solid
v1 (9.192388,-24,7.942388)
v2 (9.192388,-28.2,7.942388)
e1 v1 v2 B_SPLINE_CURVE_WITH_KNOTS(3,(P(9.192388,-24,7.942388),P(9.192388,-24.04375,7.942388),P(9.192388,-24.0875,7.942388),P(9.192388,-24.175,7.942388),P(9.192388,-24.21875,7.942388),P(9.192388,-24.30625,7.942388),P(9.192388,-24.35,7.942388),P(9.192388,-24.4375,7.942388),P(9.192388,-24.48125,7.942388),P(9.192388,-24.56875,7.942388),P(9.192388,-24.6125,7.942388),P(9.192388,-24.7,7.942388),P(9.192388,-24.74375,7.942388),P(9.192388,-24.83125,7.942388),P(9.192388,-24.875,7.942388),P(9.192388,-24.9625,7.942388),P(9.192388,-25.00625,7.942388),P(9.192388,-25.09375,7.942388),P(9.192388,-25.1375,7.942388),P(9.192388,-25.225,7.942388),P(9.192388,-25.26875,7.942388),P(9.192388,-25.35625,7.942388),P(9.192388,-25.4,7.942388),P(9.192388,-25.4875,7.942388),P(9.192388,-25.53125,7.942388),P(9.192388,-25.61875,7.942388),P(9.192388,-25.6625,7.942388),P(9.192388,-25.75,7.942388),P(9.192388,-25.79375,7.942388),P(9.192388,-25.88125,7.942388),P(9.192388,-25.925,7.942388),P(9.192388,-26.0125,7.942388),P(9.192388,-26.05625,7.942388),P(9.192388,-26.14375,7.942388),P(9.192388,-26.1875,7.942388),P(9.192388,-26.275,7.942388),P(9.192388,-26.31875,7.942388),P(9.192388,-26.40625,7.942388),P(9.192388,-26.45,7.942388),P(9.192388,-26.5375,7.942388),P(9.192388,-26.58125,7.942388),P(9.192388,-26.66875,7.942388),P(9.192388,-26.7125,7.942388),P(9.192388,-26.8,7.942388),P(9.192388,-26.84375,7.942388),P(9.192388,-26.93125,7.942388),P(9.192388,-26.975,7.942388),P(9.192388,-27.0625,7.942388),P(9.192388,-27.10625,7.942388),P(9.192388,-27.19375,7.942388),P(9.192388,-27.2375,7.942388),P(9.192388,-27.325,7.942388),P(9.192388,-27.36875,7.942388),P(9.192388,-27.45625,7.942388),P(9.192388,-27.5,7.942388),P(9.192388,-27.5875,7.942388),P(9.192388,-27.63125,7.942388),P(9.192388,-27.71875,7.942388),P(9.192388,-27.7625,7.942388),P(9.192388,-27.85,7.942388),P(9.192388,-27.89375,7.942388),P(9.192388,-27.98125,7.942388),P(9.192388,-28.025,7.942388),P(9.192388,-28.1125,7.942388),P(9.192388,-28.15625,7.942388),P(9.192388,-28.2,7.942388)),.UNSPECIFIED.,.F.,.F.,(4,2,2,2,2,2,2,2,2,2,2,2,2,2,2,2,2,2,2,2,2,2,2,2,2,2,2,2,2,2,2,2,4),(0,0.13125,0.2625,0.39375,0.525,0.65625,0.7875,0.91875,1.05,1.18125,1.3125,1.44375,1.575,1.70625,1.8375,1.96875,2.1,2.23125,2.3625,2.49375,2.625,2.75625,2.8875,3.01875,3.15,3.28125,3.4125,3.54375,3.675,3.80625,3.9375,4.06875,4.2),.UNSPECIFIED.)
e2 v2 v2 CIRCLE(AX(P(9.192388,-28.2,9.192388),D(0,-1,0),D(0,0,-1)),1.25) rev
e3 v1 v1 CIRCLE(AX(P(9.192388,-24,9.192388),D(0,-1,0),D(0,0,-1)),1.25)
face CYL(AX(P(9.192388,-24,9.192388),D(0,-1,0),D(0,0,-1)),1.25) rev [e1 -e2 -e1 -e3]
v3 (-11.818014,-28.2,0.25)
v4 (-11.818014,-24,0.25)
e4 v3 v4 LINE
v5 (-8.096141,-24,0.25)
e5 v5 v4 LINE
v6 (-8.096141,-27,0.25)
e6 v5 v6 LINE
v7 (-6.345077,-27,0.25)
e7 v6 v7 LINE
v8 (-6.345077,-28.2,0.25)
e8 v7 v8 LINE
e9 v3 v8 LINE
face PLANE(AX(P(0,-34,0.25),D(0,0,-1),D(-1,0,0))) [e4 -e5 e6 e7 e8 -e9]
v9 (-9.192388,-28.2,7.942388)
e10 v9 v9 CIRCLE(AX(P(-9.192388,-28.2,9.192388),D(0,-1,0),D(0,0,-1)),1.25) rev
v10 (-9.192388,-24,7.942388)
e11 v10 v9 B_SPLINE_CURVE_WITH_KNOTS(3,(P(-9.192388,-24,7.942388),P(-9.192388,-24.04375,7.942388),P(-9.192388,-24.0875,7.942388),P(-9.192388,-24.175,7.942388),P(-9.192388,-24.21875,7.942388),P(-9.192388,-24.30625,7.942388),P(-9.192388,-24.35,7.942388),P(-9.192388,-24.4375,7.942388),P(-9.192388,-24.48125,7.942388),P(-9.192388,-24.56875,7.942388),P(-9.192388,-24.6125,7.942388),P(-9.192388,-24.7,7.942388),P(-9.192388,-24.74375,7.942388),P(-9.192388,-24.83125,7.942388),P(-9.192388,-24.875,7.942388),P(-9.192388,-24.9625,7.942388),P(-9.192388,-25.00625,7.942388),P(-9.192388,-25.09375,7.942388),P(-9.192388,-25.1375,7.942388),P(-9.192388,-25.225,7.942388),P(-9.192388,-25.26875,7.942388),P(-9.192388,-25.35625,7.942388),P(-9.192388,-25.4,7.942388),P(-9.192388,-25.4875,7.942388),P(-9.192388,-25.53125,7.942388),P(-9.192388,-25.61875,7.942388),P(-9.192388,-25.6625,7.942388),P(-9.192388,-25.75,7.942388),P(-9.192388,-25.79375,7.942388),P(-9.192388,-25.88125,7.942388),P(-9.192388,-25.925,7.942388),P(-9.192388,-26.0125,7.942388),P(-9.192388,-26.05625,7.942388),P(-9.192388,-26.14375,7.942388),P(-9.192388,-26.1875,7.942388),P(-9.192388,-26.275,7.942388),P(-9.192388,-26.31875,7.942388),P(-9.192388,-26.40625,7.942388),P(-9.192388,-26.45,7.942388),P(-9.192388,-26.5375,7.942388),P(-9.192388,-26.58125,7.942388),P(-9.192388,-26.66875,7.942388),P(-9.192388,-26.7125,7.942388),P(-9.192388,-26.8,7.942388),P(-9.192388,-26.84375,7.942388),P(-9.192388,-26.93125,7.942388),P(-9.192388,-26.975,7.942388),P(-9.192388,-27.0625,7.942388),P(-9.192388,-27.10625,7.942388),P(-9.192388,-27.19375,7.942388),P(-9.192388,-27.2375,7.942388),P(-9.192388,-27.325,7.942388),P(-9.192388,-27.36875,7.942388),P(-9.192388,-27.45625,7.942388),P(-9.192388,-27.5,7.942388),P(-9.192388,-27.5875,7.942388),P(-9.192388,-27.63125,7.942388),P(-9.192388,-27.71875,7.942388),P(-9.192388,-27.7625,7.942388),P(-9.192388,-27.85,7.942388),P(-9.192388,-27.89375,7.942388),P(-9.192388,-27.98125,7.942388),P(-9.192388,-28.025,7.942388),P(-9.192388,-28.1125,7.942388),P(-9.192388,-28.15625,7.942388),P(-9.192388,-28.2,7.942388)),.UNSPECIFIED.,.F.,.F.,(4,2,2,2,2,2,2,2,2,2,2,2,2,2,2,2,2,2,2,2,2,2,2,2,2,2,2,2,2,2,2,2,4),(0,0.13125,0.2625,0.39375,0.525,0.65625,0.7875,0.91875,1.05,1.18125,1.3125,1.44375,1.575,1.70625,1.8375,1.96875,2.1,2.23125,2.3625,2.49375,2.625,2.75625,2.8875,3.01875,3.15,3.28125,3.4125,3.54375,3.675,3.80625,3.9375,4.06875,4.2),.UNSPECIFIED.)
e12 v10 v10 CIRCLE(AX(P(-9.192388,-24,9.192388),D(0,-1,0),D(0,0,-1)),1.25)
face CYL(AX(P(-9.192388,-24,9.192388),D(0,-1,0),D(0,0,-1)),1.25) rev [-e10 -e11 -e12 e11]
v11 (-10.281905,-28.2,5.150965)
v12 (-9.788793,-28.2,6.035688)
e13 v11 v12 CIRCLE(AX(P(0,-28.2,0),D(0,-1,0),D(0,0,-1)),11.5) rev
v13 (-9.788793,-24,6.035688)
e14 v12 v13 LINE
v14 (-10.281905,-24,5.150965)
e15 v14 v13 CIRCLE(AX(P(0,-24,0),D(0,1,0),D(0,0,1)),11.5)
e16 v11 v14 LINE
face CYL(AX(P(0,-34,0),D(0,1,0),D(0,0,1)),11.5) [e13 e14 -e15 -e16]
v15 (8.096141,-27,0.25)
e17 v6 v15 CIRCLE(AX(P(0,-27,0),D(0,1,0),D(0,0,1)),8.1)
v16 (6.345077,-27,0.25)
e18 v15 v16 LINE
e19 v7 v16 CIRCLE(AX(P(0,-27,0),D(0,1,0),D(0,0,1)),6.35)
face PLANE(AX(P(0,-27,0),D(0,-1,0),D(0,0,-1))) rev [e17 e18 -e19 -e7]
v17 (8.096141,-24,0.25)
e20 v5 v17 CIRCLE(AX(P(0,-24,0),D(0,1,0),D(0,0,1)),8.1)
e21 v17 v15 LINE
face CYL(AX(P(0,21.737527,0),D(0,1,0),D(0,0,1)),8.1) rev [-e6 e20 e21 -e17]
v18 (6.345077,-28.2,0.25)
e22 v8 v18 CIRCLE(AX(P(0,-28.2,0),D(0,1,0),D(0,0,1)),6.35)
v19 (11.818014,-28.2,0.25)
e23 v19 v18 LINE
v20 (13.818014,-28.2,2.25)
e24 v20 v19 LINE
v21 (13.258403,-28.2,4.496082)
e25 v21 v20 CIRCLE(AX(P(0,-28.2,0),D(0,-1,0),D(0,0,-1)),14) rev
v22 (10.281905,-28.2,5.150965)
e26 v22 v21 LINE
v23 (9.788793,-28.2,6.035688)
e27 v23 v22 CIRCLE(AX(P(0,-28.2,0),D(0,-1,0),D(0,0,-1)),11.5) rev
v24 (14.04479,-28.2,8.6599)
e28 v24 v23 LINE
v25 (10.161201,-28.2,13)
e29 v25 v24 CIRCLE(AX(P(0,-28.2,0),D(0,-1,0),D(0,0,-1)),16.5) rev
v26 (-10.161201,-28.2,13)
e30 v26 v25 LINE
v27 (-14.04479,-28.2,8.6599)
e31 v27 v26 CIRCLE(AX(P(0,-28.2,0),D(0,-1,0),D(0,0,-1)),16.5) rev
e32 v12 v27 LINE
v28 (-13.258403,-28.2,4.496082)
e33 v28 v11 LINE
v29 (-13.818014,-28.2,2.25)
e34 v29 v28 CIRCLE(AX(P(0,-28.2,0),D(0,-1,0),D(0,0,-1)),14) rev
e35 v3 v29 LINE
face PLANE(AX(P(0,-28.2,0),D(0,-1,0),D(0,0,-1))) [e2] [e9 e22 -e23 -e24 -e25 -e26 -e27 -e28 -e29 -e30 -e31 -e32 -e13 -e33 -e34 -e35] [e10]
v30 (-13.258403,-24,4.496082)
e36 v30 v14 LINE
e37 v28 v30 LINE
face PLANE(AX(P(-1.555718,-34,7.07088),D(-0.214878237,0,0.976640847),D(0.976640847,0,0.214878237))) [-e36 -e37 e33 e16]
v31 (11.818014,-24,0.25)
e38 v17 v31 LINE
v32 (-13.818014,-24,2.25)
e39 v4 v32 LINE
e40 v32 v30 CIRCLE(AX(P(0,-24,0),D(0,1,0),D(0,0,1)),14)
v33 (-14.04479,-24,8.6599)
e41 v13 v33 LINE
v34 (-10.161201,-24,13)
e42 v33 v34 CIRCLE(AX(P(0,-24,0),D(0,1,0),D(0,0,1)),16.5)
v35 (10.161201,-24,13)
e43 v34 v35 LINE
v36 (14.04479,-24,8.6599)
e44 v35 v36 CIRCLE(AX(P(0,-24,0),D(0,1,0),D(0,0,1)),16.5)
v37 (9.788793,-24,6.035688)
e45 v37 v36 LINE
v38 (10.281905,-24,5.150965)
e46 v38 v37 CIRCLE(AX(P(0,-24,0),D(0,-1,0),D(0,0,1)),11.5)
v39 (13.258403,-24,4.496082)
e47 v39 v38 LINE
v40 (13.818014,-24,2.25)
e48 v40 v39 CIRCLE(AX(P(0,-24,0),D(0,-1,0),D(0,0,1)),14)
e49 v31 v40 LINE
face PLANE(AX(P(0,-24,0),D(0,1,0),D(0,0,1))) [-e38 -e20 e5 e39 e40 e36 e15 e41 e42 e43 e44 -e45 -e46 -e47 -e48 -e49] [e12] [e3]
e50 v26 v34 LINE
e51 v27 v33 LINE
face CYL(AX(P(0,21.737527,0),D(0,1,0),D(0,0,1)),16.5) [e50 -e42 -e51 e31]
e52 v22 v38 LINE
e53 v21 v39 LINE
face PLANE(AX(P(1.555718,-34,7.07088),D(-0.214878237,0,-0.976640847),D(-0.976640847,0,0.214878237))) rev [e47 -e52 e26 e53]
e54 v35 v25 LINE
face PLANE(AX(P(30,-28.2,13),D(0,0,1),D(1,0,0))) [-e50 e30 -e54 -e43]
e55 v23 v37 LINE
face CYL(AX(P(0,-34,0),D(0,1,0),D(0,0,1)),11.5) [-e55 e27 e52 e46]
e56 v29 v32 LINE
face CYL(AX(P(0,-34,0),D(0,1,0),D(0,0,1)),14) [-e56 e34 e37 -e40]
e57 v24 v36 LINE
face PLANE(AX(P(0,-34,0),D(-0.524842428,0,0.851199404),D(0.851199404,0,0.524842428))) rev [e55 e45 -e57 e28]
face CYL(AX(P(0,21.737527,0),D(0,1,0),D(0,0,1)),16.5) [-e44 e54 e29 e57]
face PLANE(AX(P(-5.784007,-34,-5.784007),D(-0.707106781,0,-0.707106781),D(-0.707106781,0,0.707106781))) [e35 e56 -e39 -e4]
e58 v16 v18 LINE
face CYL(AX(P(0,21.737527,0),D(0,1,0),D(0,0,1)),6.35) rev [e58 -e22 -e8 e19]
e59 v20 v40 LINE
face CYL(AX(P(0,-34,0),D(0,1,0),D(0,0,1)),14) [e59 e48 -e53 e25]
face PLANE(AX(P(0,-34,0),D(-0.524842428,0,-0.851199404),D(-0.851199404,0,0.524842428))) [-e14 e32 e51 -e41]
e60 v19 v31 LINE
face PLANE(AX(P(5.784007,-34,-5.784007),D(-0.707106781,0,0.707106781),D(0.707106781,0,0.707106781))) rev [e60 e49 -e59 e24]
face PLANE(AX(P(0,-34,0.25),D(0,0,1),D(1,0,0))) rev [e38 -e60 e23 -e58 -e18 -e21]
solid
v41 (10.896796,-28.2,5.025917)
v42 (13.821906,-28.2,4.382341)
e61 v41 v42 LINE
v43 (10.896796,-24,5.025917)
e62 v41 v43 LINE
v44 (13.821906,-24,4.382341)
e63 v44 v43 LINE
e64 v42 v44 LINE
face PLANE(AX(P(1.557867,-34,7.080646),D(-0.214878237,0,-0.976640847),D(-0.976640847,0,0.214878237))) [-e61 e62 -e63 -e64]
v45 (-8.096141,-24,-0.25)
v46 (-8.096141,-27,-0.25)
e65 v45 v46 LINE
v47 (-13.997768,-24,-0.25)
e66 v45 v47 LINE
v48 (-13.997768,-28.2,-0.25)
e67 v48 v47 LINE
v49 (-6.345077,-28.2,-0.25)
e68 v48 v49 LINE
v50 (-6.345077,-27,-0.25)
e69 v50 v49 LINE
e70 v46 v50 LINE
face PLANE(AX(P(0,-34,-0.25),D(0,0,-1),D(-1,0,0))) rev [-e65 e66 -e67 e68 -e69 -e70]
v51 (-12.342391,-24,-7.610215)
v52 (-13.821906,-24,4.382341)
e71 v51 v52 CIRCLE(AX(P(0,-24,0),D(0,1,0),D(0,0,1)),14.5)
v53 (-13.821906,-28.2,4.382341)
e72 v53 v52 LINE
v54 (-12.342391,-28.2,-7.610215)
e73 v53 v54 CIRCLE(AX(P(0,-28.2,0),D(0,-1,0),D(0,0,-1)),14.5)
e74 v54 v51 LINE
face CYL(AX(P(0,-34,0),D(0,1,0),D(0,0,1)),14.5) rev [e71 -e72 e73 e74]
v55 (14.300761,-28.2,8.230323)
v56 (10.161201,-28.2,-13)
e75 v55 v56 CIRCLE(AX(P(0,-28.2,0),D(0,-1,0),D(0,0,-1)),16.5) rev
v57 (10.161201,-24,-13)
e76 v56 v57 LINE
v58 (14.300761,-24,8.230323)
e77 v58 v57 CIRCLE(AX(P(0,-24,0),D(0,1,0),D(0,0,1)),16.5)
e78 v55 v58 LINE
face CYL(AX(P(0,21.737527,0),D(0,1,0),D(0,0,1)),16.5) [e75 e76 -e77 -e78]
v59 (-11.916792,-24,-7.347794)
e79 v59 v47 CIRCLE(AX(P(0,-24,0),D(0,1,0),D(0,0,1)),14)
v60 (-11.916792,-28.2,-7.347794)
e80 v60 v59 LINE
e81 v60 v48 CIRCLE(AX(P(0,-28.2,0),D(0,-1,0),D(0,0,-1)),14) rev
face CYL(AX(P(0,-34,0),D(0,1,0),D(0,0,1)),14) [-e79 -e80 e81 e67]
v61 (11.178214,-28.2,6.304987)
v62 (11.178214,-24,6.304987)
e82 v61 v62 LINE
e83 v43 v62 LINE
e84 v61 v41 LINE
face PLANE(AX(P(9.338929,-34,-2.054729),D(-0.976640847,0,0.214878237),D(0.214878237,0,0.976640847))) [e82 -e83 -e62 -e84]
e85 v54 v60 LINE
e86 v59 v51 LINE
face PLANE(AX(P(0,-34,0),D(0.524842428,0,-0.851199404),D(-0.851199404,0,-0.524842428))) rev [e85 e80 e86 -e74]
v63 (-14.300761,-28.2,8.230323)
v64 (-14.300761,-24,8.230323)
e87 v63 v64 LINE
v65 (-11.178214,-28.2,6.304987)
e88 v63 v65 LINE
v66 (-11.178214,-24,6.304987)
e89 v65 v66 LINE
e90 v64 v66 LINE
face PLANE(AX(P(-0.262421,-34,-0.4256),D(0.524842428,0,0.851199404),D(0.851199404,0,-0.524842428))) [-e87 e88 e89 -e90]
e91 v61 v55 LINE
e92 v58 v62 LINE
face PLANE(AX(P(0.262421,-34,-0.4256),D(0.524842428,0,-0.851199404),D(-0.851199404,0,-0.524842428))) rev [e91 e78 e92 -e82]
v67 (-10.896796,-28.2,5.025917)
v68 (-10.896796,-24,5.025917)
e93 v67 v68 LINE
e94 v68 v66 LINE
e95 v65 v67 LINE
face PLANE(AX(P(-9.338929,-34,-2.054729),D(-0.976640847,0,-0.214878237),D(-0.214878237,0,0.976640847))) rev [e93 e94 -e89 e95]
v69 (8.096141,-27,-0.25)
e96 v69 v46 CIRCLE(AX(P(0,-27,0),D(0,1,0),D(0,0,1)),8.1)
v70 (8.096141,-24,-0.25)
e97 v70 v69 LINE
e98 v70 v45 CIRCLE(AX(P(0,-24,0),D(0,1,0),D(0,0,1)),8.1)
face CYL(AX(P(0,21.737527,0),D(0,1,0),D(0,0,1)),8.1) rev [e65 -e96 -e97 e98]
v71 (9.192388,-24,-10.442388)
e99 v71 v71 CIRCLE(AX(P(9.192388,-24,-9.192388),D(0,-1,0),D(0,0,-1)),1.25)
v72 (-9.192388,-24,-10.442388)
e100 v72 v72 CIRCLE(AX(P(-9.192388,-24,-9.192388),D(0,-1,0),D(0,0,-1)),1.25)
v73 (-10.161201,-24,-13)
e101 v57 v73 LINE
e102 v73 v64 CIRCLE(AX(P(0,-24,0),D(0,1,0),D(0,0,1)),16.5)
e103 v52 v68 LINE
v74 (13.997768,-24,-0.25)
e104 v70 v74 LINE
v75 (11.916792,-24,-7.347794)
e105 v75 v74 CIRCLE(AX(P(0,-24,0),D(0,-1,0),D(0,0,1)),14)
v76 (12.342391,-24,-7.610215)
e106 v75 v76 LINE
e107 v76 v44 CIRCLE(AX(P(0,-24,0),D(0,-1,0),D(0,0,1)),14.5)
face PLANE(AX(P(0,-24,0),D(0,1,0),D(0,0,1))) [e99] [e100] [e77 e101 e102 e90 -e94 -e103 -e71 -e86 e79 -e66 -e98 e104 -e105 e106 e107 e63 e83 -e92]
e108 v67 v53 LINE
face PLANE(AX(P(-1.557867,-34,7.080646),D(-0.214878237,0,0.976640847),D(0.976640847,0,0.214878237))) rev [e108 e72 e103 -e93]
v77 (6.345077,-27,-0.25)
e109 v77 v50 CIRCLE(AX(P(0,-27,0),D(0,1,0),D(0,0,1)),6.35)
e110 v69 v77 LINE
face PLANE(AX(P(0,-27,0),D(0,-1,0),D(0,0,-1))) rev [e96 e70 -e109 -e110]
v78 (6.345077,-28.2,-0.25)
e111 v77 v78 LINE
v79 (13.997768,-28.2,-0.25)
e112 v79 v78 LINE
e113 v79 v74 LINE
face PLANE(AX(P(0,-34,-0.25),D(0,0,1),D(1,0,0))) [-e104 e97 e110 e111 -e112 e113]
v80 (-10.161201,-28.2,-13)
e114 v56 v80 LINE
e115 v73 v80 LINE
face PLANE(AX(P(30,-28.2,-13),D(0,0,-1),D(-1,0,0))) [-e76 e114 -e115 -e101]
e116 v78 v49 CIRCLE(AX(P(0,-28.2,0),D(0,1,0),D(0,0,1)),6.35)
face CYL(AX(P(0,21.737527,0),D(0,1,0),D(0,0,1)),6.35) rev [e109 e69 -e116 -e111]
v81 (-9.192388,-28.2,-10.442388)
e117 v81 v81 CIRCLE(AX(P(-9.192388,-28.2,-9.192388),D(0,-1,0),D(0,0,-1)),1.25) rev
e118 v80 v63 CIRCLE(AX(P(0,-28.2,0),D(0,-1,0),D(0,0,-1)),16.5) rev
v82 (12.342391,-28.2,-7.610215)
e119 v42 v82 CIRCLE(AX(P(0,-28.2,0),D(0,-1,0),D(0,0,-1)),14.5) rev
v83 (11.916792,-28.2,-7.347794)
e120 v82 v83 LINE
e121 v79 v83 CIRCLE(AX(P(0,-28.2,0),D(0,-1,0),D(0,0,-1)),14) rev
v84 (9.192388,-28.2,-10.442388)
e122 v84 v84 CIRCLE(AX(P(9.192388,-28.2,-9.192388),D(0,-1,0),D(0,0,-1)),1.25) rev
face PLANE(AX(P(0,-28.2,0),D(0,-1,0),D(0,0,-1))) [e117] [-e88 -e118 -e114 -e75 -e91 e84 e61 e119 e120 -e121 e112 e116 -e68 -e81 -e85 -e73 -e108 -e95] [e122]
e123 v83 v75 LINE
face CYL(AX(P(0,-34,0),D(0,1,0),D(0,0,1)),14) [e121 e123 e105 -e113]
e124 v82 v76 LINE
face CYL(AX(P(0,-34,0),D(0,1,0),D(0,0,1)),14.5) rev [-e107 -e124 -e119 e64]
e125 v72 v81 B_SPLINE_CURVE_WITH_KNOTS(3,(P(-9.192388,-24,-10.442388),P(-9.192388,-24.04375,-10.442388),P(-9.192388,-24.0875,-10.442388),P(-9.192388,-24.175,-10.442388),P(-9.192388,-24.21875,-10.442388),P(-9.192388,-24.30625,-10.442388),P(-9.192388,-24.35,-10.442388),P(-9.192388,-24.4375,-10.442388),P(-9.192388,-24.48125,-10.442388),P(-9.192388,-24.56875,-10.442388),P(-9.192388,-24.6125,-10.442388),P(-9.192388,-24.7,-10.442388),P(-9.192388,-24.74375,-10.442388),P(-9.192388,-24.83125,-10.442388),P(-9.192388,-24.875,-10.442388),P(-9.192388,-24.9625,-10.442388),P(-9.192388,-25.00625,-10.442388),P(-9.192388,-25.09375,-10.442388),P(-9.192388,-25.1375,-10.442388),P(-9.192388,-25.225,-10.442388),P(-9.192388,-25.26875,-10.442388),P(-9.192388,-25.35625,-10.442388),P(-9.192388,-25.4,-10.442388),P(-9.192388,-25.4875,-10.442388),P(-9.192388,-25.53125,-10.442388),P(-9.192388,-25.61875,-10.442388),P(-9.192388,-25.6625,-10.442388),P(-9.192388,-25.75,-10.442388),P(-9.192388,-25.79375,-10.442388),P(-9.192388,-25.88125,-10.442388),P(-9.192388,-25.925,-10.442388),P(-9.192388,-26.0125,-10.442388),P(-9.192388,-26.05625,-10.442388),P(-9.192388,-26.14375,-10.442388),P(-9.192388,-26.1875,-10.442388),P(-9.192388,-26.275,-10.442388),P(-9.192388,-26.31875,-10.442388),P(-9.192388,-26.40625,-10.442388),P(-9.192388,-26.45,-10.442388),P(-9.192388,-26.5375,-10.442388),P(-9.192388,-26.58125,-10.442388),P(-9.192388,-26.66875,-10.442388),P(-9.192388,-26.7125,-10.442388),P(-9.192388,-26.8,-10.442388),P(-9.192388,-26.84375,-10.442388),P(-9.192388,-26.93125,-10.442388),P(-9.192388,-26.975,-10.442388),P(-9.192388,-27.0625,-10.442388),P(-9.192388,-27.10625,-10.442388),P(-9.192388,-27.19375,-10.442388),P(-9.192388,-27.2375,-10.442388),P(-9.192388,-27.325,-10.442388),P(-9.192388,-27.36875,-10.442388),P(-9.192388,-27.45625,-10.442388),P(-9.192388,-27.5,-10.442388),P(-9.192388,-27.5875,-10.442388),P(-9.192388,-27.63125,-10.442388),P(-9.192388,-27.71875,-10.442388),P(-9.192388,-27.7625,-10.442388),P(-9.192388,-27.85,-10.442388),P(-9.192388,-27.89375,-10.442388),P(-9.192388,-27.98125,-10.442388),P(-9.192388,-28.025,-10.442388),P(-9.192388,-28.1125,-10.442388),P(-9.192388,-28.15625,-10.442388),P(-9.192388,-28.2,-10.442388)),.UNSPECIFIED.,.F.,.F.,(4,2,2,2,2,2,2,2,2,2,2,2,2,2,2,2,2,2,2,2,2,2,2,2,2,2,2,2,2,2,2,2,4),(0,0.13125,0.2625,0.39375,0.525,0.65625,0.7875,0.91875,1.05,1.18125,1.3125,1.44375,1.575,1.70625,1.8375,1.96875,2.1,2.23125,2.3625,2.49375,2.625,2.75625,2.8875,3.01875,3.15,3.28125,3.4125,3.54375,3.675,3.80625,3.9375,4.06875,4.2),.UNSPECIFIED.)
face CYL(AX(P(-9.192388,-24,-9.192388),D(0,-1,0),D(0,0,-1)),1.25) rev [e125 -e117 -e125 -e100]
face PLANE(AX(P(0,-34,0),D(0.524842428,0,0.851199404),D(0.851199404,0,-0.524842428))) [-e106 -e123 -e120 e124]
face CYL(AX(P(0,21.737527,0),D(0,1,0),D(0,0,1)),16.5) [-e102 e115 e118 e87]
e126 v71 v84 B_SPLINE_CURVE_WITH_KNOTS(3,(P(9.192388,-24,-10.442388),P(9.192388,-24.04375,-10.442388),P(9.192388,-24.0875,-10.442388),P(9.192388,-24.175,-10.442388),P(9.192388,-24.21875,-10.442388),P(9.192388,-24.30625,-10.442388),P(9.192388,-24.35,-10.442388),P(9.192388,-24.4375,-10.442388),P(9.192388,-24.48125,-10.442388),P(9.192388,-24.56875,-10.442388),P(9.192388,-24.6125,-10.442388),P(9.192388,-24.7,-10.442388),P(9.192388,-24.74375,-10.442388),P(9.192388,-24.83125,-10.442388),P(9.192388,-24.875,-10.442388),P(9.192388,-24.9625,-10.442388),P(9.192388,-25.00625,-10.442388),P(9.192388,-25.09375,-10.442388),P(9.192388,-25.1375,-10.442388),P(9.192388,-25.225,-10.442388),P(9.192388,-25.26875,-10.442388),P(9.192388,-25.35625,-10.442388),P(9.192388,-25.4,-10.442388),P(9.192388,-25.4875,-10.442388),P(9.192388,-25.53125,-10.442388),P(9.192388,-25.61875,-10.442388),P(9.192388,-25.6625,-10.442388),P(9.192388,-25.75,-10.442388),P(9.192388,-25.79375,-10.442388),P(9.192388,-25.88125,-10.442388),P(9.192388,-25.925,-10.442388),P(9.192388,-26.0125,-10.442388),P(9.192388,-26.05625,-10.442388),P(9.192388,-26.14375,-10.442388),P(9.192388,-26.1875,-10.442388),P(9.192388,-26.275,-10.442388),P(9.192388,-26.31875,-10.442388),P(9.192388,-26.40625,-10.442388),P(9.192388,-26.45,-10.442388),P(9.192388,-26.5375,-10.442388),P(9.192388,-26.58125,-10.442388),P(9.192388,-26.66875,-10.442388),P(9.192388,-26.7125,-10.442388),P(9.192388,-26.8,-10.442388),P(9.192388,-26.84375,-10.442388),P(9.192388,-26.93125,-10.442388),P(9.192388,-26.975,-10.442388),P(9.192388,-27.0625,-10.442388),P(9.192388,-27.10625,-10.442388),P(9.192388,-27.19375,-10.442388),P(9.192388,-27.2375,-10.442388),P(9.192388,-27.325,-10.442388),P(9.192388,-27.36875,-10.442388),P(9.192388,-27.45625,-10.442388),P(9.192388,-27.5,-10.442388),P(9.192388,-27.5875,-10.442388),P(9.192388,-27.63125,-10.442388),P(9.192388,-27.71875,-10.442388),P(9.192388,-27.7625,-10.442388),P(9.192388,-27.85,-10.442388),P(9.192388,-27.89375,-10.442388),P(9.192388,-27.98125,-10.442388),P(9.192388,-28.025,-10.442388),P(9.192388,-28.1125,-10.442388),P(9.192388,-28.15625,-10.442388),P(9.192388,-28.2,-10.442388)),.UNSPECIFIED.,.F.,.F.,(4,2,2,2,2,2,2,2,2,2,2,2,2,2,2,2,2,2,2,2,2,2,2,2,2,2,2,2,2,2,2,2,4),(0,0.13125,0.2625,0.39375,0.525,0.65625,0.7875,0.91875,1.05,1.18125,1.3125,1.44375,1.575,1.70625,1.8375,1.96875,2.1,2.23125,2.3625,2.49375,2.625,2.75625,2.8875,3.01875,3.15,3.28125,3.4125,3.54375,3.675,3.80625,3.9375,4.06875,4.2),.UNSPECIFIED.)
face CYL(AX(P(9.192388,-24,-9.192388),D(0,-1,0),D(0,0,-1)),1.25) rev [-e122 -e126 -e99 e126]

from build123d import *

# Parameters (mm, degrees)
SKETCH4_R            = 1.2
CUT_EXTRUDE2_DEPTH   = 27.711420778
SKETCH4_3_R          = 2.25
SKETCH4_3_R_2        = 1.2
CUT_EXTRUDE3_DEPTH   = 9.4
CHAMFER1_SIZE        = 1
SKETCH2_W            = 41.708786628
SKETCH2_H            = 54.576605706
CUT_EXTRUDE1_DEPTH   = 0.05
SKETCH1_5_W          = 8.4
SKETCH1_5_H          = 3
SKETCH1_5_H_2        = 1.2
SKETCH10_R           = 1.25
CUT_EXTRUDE9_DEPTH   = 24.951200387
CUT_EXTRUDE6_START   = -5.4
CUT_EXTRUDE6_DEPTH   = 5.4
CUT_EXTRUDE7_DEPTH   = 1.2
SKETCH11_OUTSIDE_W   = 44.372
SKETCH11_OUTSIDE_H   = 44.372
SKETCH11_OUTSIDE_W_2 = 60
SKETCH11_OUTSIDE_H_2 = 26
CUT_EXTRUDE10_DEPTH  = 24.70949177


# Read off the part's stored shape, not the designer's step: Cut-Extrude6
with BuildPart() as part:
    # Sketch1 → Revolve1 (revolve)
    with BuildSketch(Plane.XY, mode=Mode.PRIVATE) as revolve1_sk:
        Polygon((-3, 0), (-8, 0), (-8, -3.7), (-6, -3.7), (-6, -9.7), (-8, -9.7), (-8, -13), (-16.5, -13), (-16.5, -23.9), (-6.1, -23.9), (-6.1, -21), (-8.1, -21), (-8.1, -14.3), (-3, -14.3), align=None)
    revolve(revolve1_sk.sketch.rotate(Axis((0, 21.737527327, 0), (0, -1, 0)), 270), axis=Axis((0, 21.737527327, 0), (0, -1, 0)))

    # Sketch4 → Cut-Extrude2 (cut, through all)
    with BuildSketch(Plane(origin=(0, -13, 0), x_dir=(1, 0, 0), z_dir=(0, 1, 0))):
        with Locations(Location((-9.192388155, 9.192388155, 0), (0, 0, 270))):
            Circle(SKETCH4_R)
        with Locations(Location((9.192388155, 9.192388155, 0), (0, 0, 270))):
            Circle(SKETCH4_R)
        with Locations(Location((9.192388155, -9.192388155, 0), (0, 0, 270))):
            Circle(SKETCH4_R)
        with Locations(Location((-9.192388155, -9.192388155, 0), (0, 0, 270))):
            Circle(SKETCH4_R)
    extrude(amount=-CUT_EXTRUDE2_DEPTH, mode=Mode.SUBTRACT)

    # Sketch4<3> → Cut-Extrude3 (cut)
    # profile 1 of 5: a face of its own
    with BuildSketch(Plane(origin=(0, -13, 0), x_dir=(1, 0, 0), z_dir=(0, 1, 0))):
        with Locations(Location((9.192388155, 9.192388155, 0), (0, 0, 270))):
            Circle(SKETCH4_3_R)
        with Locations(Location((9.192388155, 9.192388155, 0), (0, 0, 270))):
            Circle(SKETCH4_3_R_2, mode=Mode.SUBTRACT)
    # profile 2 of 5: a face of its own
    with BuildSketch(Plane(origin=(0, -13, 0), x_dir=(1, 0, 0), z_dir=(0, 1, 0))):
        with Locations(Location((9.192388155, -9.192388155, 0), (0, 0, 270))):
            Circle(SKETCH4_3_R)
        with Locations(Location((9.192388155, -9.192388155, 0), (0, 0, 270))):
            Circle(SKETCH4_3_R_2, mode=Mode.SUBTRACT)
    # profile 3 of 5: a face of its own
    with BuildSketch(Plane(origin=(0, -13, 0), x_dir=(1, 0, 0), z_dir=(0, 1, 0))):
        with Locations(Location((-9.192388155, -9.192388155, 0), (0, 0, 270))):
            Circle(SKETCH4_3_R)
        with Locations(Location((-9.192388155, -9.192388155, 0), (0, 0, 270))):
            Circle(SKETCH4_3_R_2, mode=Mode.SUBTRACT)
    # profile 4 of 5: a face of its own
    with BuildSketch(Plane(origin=(0, -13, 0), x_dir=(1, 0, 0), z_dir=(0, 1, 0))):
        with Locations(Location((-9.192388155, 9.192388155, 0), (0, 0, 270))):
            Circle(SKETCH4_3_R_2)
    # profile 5 of 5: a face of its own
    with BuildSketch(Plane(origin=(0, -13, 0), x_dir=(1, 0, 0), z_dir=(0, 1, 0))):
        with Locations(Location((-9.192388155, 9.192388155, 0), (0, 0, 270))):
            Circle(SKETCH4_3_R)
    extrude(amount=-CUT_EXTRUDE3_DEPTH, mode=Mode.SUBTRACT)

    # Chamfer1
    chamfer1_edges = [part.edges().sort_by_distance(p)[0] for p in [
        (0, 0, -3),
    ]]
    chamfer(chamfer1_edges, length=CHAMFER1_SIZE)

    # Sketch2 → Cut-Extrude1 (cut, symmetric)
    with BuildSketch(Plane.XY):
        Rectangle(SKETCH2_W, SKETCH2_H)
    extrude(amount=CUT_EXTRUDE1_DEPTH, both=True, mode=Mode.SUBTRACT)


with BuildPart() as cut_extrude1_piece_1:
    # of the separate pieces the step leaves, piece 1, a body of its own (cut_extrude1_pieces)
    add(part.part.solids().sort_by_distance((-2.999583304, -1, 0.05))[0])


with BuildPart() as cut_extrude1_piece_2:
    # of the separate pieces the step leaves, piece 2, a body of its own (cut_extrude1_pieces)
    add(part.part.solids().sort_by_distance((-2.999583304, -1, -0.05))[0])


with BuildPart() as body_3:
    # Sketch1<5> → Revolve2 (revolve)
    with BuildSketch(Plane.XY, mode=Mode.PRIVATE) as revolve2_sk:
        with Locations((-12.3, -25.5)):
            Rectangle(SKETCH1_5_W, SKETCH1_5_H)
        Polygon((-6.35, -27), (-8.1, -27), (-16.5, -27), (-16.5, -28.2), (-8.1, -28.2), (-6.35, -28.2), align=None)
        with Locations((-12.3, -28.8)):
            Rectangle(SKETCH1_5_W, SKETCH1_5_H_2)
    revolve(revolve2_sk.sketch.rotate(Axis((0, 21.737527327, 0), (0, -1, 0)), 270), axis=Axis((0, 21.737527327, 0), (0, -1, 0)))

    # Sketch10 → Cut-Extrude9 (cut, through all)
    with BuildSketch(Plane.XZ.offset(29.4)):
        with Locations(Location((-9.192388155, 9.192388155, 0), (0, 0, 270))):
            Circle(SKETCH10_R)
        with Locations(Location((9.192388155, 9.192388155, 0), (0, 0, 270))):
            Circle(SKETCH10_R)
        with Locations(Location((9.192388155, -9.192388155, 0), (0, 0, 270))):
            Circle(SKETCH10_R)
        with Locations(Location((-9.192388155, -9.192388155, 0), (0, 0, 270))):
            Circle(SKETCH10_R)
    extrude(amount=-CUT_EXTRUDE9_DEPTH, mode=Mode.SUBTRACT)

    # Cut-Extrude6 outline → Cut-Extrude6 (cut)
    with BuildSketch(Plane(origin=(0, -24, 0), x_dir=(1, 0, 0), z_dir=(0, 1, 0)).offset(CUT_EXTRUDE6_START)):
        with BuildLine():
            ThreePointArc((-6.345076832, -0.25), (-6.35, 0), (-6.345076832, 0.25))
            Line((-6.345076832, 0.25), (-13.997767679, 0.25))
            ThreePointArc((-13.997767679, 0.25), (-13.434499109, 3.938811204), (-11.916791658, 7.347793995))
            Line((-11.916791658, 7.347793995), (-12.34239136, 7.610215209))
            ThreePointArc((-12.34239136, 7.610215209), (-14.390898722, 1.775396852), (-13.821906079, -4.382340966))
            Line((-13.821906079, -4.382340966), (-10.896795834, -5.025916887))
            Line((-10.896795834, -5.025916887), (-11.178213769, -6.304986624))
            Line((-11.178213769, -6.304986624), (-14.300761421, -8.230323371))
            ThreePointArc((-14.300761421, -8.230323371), (-14.174403259, -8.446081473), (-14.044790168, -8.659900065))
            Line((-14.044790168, -8.659900065), (-9.788793147, -6.035687924))
            ThreePointArc((-9.788793147, -6.035687924), (-10.045093899, -5.598757771), (-10.281904658, -5.150964628))
            Line((-10.281904658, -5.150964628), (-13.258402706, -4.496082483))
            ThreePointArc((-13.258402706, -4.496082483), (-13.584708377, -3.38462676), (-13.818013605, -2.25))
            Line((-13.818013605, -2.25), (-11.818013605, -0.25))
            Line((-11.818013605, -0.25), (-6.345076832, -0.25))
        make_face()
    cut_extrude6 = extrude(amount=CUT_EXTRUDE6_DEPTH, mode=Mode.SUBTRACT)

    # Sketch8 → Cut-Extrude7 (cut)
    with BuildSketch(Plane.XZ.offset(29.4)):
        with BuildLine():
            Line((-11.818013605, 0.25), (-8.096141056, 0.25))
            ThreePointArc((-8.096141056, 0.25), (8.1, 0), (-8.096141056, -0.25))
            Line((-8.096141056, -0.25), (-13.997767679, -0.25))
            ThreePointArc((-13.997767679, -0.25), (-13.434499109, -3.938811203), (-11.916791658, -7.347793995))
            Line((-11.916791658, -7.347793995), (-12.34239136, -7.610215209))
            ThreePointArc((-12.34239136, -7.610215209), (-14.390898722, -1.775396852), (-13.821906079, 4.382340966))
            Line((-13.821906079, 4.382340966), (-10.896795834, 5.025916887))
            Line((-10.896795834, 5.025916887), (-11.178213769, 6.304986624))
            Line((-11.178213769, 6.304986624), (-14.300761421, 8.230323371))
            ThreePointArc((-14.300761421, 8.230323371), (14.174403259, -8.446081473), (-14.044790168, 8.659900065))
            Line((-14.044790168, 8.659900065), (-9.788793147, 6.035687924))
            ThreePointArc((-9.788793147, 6.035687924), (-10.045093899, 5.59875777), (-10.281904658, 5.150964628))
            Line((-10.281904658, 5.150964628), (-13.258402706, 4.496082483))
            ThreePointArc((-13.258402706, 4.496082483), (-13.584708377, 3.38462676), (-13.818013605, 2.25))
            Line((-13.818013605, 2.25), (-11.818013605, 0.25))
        make_face()
    extrude(amount=-CUT_EXTRUDE7_DEPTH, mode=Mode.SUBTRACT)

    # Mirror2: Cut-Extrude6 across plane
    add(cut_extrude6.mirror(Plane(origin=(0, 0, 0), x_dir=(0, 0, 1), z_dir=(1, 0, 0))), mode=Mode.SUBTRACT)

    # Sketch11 outside → Cut-Extrude10 (cut, through all)
    with BuildSketch(Plane(origin=(0, -24, 0), x_dir=(1, 0, 0), z_dir=(0, 1, 0))):
        Rectangle(SKETCH11_OUTSIDE_W, SKETCH11_OUTSIDE_H)
        Rectangle(SKETCH11_OUTSIDE_W_2, SKETCH11_OUTSIDE_H_2, mode=Mode.SUBTRACT)
    extrude(amount=-CUT_EXTRUDE10_DEPTH, mode=Mode.SUBTRACT)


solid = body_3.part
